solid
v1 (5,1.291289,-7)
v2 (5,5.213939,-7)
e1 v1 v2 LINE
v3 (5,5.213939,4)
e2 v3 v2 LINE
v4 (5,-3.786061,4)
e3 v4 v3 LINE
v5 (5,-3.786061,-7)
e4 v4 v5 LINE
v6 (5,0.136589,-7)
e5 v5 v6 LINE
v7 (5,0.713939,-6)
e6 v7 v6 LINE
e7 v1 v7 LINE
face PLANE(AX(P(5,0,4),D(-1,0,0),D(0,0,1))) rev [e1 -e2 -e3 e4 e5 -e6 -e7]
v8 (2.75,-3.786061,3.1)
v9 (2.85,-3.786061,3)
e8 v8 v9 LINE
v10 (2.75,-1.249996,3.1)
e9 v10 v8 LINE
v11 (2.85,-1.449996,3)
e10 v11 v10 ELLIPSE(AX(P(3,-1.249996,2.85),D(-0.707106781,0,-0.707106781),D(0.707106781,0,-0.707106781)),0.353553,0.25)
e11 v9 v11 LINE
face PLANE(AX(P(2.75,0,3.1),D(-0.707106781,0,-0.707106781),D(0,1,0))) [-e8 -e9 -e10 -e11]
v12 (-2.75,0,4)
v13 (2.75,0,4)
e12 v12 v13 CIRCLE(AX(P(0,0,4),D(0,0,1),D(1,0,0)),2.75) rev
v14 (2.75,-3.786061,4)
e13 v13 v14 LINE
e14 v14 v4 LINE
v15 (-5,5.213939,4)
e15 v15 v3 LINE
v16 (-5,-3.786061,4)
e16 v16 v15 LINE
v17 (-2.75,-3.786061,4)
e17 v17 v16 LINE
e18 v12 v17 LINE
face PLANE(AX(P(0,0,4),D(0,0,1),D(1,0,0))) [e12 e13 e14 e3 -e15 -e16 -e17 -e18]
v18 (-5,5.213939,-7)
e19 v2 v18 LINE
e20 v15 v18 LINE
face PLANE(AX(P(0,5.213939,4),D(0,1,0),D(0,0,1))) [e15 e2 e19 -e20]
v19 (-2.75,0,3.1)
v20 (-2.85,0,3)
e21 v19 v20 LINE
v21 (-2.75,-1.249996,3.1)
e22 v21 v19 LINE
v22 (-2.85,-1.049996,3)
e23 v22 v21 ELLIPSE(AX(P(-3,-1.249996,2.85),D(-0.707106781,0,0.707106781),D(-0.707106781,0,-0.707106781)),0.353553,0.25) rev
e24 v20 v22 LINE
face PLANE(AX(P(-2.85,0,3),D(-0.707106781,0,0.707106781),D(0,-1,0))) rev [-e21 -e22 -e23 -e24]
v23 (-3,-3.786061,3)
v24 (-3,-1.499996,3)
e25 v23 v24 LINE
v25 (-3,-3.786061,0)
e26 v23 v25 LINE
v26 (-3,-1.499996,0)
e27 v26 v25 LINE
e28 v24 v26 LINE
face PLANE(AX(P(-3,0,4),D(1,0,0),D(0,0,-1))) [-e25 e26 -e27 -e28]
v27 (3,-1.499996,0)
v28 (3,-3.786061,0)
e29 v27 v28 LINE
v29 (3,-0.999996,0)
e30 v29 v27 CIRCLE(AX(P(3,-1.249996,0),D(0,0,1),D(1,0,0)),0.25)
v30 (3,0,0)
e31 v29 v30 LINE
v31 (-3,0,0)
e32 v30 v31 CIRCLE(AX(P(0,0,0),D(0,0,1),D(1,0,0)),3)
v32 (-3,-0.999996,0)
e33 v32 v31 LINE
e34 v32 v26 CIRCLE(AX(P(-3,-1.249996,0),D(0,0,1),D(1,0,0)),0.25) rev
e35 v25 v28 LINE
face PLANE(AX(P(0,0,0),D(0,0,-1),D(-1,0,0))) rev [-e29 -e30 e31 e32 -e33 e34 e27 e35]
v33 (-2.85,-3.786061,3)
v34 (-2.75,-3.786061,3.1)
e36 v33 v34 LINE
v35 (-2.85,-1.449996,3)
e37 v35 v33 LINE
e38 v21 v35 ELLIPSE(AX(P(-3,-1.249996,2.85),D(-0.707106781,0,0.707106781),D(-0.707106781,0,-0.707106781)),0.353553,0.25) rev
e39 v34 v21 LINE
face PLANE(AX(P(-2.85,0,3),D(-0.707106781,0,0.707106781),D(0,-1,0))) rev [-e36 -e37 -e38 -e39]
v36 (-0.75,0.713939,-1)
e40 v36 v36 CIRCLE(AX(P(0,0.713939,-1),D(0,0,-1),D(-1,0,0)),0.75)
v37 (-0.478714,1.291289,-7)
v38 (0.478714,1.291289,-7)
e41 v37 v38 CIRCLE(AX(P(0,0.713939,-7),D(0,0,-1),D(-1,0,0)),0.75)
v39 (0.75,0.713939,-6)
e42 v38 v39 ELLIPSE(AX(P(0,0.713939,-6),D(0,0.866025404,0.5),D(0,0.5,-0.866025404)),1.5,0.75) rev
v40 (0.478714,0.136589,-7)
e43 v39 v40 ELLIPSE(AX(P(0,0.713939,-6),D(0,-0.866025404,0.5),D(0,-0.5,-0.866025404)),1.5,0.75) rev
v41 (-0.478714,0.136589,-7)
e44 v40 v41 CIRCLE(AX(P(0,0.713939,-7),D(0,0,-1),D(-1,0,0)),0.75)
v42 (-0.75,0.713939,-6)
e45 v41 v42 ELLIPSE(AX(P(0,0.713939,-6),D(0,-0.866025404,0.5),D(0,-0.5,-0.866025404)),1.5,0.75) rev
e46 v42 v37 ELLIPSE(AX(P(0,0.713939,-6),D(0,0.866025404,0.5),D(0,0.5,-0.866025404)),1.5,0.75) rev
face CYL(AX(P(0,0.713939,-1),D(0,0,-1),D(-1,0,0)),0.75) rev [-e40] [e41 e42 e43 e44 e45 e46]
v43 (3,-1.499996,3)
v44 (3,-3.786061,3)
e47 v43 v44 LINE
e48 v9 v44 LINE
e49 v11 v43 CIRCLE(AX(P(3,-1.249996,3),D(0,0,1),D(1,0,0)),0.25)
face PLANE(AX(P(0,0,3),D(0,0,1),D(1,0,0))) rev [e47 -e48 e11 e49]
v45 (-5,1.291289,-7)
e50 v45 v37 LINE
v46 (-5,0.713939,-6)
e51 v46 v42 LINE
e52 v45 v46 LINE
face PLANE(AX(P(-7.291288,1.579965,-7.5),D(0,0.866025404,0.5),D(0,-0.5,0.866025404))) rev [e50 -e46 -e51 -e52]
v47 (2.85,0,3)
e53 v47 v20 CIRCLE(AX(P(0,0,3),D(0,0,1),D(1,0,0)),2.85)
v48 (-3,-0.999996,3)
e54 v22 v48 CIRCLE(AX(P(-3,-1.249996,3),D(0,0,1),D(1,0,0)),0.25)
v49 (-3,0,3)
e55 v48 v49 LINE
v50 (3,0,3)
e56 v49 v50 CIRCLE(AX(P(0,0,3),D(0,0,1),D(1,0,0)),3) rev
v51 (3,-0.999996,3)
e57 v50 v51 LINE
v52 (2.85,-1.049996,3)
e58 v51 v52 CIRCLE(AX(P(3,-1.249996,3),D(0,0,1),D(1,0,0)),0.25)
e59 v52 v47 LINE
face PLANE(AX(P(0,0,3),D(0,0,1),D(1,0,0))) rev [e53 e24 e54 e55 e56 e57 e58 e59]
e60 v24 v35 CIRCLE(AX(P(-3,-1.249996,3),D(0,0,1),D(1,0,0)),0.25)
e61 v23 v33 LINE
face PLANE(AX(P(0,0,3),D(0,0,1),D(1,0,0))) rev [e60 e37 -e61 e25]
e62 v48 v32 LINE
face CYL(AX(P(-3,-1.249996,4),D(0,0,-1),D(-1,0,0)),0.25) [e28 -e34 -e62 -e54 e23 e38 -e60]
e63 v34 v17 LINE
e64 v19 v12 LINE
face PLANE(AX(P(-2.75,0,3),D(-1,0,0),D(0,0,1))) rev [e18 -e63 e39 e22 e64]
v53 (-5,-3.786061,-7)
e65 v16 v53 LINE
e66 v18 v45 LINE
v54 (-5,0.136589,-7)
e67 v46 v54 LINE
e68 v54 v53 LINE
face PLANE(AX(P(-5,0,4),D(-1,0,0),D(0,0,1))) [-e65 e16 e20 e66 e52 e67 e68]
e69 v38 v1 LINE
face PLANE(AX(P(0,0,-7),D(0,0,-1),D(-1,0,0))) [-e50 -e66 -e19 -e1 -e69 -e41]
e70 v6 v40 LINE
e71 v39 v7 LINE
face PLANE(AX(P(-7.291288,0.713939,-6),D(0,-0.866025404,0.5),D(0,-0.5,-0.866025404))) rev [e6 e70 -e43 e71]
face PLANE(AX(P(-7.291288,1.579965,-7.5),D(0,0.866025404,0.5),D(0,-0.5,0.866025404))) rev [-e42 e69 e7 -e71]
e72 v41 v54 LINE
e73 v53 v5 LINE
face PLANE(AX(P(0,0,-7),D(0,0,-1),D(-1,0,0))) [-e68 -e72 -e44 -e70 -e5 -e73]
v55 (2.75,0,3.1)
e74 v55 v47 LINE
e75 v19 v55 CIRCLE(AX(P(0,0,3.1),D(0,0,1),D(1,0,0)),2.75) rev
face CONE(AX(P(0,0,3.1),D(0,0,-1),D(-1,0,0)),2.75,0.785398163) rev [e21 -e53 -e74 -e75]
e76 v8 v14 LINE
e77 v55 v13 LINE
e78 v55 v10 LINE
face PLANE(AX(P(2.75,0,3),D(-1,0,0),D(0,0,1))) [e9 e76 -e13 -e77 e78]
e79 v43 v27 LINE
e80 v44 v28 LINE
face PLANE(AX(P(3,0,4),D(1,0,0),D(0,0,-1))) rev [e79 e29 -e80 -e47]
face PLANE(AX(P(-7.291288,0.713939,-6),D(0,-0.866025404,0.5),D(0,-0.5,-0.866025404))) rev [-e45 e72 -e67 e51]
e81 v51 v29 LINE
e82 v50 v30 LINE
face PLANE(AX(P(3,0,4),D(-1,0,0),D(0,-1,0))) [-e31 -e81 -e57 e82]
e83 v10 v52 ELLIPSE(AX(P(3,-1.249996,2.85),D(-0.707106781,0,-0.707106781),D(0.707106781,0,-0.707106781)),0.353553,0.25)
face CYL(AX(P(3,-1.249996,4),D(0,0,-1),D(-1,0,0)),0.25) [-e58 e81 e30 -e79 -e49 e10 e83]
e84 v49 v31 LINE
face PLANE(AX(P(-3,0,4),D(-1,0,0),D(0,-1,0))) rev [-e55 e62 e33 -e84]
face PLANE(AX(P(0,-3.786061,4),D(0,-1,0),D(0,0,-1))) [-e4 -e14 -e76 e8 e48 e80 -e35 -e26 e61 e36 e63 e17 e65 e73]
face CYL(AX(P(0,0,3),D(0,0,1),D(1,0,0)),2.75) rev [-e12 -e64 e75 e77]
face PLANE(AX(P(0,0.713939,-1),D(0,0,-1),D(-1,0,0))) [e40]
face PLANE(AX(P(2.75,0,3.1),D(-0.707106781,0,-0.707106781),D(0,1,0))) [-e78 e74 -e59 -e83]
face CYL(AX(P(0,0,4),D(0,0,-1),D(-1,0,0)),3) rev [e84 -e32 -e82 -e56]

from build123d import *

# Parameters (mm, degrees)
BOSS_EXTRUDE1_DEPTH = 4
SKETCH2_W           = 10
SKETCH2_H           = 9
BOSS_EXTRUDE2_DEPTH = 7
SKETCH3_R           = 0.75
CUT_EXTRUDE1_DEPTH  = 6
CUT_EXTRUDE3_REACH  = 15.273
BOSS_EXTRUDE3_START = -1
BOSS_EXTRUDE3_DEPTH = 1
CHAMFER1_SIZE       = 0.1


with BuildPart() as part:
    # Sketch1 → Boss-Extrude1 (new body)
    with BuildSketch(Plane.XY):
        with BuildLine():
            Line((-3, -3.786060838), (-3, -1.49999581))
            ThreePointArc((-3, -1.49999581), (-2.791987509, -1.388670983), (-2.769230655, -1.153842239))
            ThreePointArc((-2.769230655, -1.153842239), (-2.861324827, -1.041983319), (-3, -0.99999581))
            Line((-3, -0.99999581), (-3, 0))
            ThreePointArc((-3, 0), (0, 3), (3, 0))
            Line((3, 0), (3, -0.99999581))
            ThreePointArc((3, -0.99999581), (2.861324827, -1.041983319), (2.769230655, -1.153842239))
            ThreePointArc((2.769230655, -1.153842239), (2.791987509, -1.388670983), (3, -1.49999581))
            Line((3, -1.49999581), (3, -3.786060838))
            Line((3, -3.786060838), (5, -3.786060838))
            Line((5, -3.786060838), (5, 5.213939162))
            Line((5, 5.213939162), (-5, 5.213939162))
            Line((-5, 5.213939162), (-5, -3.786060838))
            Line((-5, -3.786060838), (-3, -3.786060838))
        make_face()
    extrude(amount=BOSS_EXTRUDE1_DEPTH)

    # Sketch2 → Boss-Extrude2 (add)
    with BuildSketch(Plane.XY):
        with Locations((0, 0.713939162)):
            Rectangle(SKETCH2_W, SKETCH2_H)
    extrude(amount=-BOSS_EXTRUDE2_DEPTH)

    # Sketch3 → Cut-Extrude1 (cut)
    with BuildSketch(Plane(origin=(0, 0, -7), x_dir=(-1, 0, 0), z_dir=(0, 0, -1))):
        with Locations((0, 0.713939162)):
            Circle(SKETCH3_R)
    extrude(amount=-CUT_EXTRUDE1_DEPTH, mode=Mode.SUBTRACT)

    # Cut-Extrude3: up to this face of the body (flat: up to its plane)
    cut_extrude3_end = Plane(part.part.faces().sort_by_distance((-5, 0.713939162, -1.5))[0])
    # Sketch4 → Cut-Extrude3 (cut, up to the picked face)
    with BuildSketch(Plane(origin=(5, 0, 0), x_dir=(0, 0, -1), z_dir=(1, 0, 0)), mode=Mode.PRIVATE) as cut_extrude3_sk1:
        Polygon((7.5, -0.152086242), (7.5, 1.579964565), (6, 0.713939162), align=None)
    cut_extrude3_tool1 = split(extrude(cut_extrude3_sk1.sketch, amount=-CUT_EXTRUDE3_REACH, mode=Mode.PRIVATE), bisect_by=cut_extrude3_end, keep=Keep.BOTH, mode=Mode.PRIVATE)
    add(cut_extrude3_tool1.solids().sort_by(Axis((5, 0.713939, -7), (-1, 0, 0)))[0], mode=Mode.SUBTRACT)

    # Sketch5 → Boss-Extrude3 (add)
    with BuildSketch(Plane.XY.offset(4).offset(BOSS_EXTRUDE3_START)):
        with BuildLine():
            ThreePointArc((3, 0), (0, 3), (-3, 0))
            Line((-3, 0), (-3, -3.786060838))
            Line((-3, -3.786060838), (-2.75, -3.786060838))
            Line((-2.75, -3.786060838), (-2.75, 0))
            ThreePointArc((-2.75, 0), (0, 2.75), (2.75, 0))
            Line((2.75, 0), (2.75, -3.786060838))
            Line((2.75, -3.786060838), (3, -3.786060838))
            Line((3, -3.786060838), (3, 0))
        make_face()
    extrude(amount=BOSS_EXTRUDE3_DEPTH)

    # Chamfer1
    # the kernel refuses this chamfer: 0.1 mm, written as the material it takes off along each edge
    with BuildSketch(Plane(origin=(2.75, -1.24999581, 3), x_dir=(-0.027495876610587302, 0, 0.9996219169112966), z_dir=(0, -1, 0))) as chamfer1_piece_1_section:
        Polygon((CHAMFER1_SIZE * 0.999621916911, -CHAMFER1_SIZE * 0.0274958766106), (-CHAMFER1_SIZE * 0.0274958766106, -CHAMFER1_SIZE * 0.999621916911), (0, 0), align=None)
    chamfer1_piece_1 = extrude(amount=2.793233327, mode=Mode.PRIVATE)
    chamfer1_piece_1 = chamfer1_piece_1 - Plane(origin=(3, -1.24999581, 3.033543391), x_dir=(0, 1, 0), z_dir=(0, 0, -1)) * Cylinder(0.25, 6, mode=Mode.PRIVATE)
    add(chamfer1_piece_1, mode=Mode.SUBTRACT)
    with BuildSketch(Plane(origin=(-2.75, -4.043229137, 3), x_dir=(-0.9996219169112966, 0, -0.027495876610587302), z_dir=(0, 1, 0))) as chamfer1_piece_2_section:
        Polygon((CHAMFER1_SIZE * 0.999621916911, CHAMFER1_SIZE * 0.0274958766106), (-CHAMFER1_SIZE * 0.0274958766106, CHAMFER1_SIZE * 0.999621916911), (0, 0), align=None)
    chamfer1_piece_2 = extrude(amount=2.793233327, mode=Mode.PRIVATE)
    chamfer1_piece_2 = chamfer1_piece_2 - Plane(origin=(-3, -1.24999581, 3.033543414), x_dir=(0, -1, 0), z_dir=(0, 0, -1)) * Cylinder(0.25, 6, mode=Mode.PRIVATE)
    add(chamfer1_piece_2, mode=Mode.SUBTRACT)
    with BuildSketch(Plane(origin=(2.75, 0, 3), x_dir=(-0.027495876610587302, 0, 0.9996219169112966), z_dir=(0, -1, 0))) as chamfer1_piece_3_section:
        Polygon((CHAMFER1_SIZE * 0.999621916911, -CHAMFER1_SIZE * 0.0274958766106), (-CHAMFER1_SIZE * 0.0274958766106, -CHAMFER1_SIZE * 0.999621916911), (0, 0), align=None)
    chamfer1_piece_3 = extrude(amount=1.24999581, mode=Mode.PRIVATE)
    chamfer1_piece_3 = chamfer1_piece_3 - Plane(origin=(3, -1.24999581, 3.033781207), x_dir=(0, 1, 0), z_dir=(0, 0, -1)) * Cylinder(0.25, 3, mode=Mode.PRIVATE)
    add(chamfer1_piece_3, mode=Mode.SUBTRACT)
    with BuildSketch(Plane(origin=(0, 0, 3), x_dir=(-1, 0, 0), z_dir=(0, -1, 0))) as chamfer1_piece_4:
        Polygon((2.75, -CHAMFER1_SIZE), (2.75 + CHAMFER1_SIZE, 0), (2.75, 0), align=None)
    revolve(axis=Axis((0, 0, 3), (0, 0, -1)), revolution_arc=180, mode=Mode.SUBTRACT)
    with BuildSketch(Plane(origin=(-2.75, -1.24999581, 3), x_dir=(-0.9996219169112966, 0, -0.027495876610587302), z_dir=(0, 1, 0))) as chamfer1_piece_5_section:
        Polygon((CHAMFER1_SIZE * 0.999621916911, CHAMFER1_SIZE * 0.0274958766106), (-CHAMFER1_SIZE * 0.0274958766106, CHAMFER1_SIZE * 0.999621916911), (0, 0), align=None)
    chamfer1_piece_5 = extrude(amount=1.24999581, mode=Mode.PRIVATE)
    chamfer1_piece_5 = chamfer1_piece_5 - Plane(origin=(-3, -1.24999581, 3.033781195), x_dir=(0, -1, 0), z_dir=(0, 0, -1)) * Cylinder(0.25, 3, mode=Mode.PRIVATE)
    add(chamfer1_piece_5, mode=Mode.SUBTRACT)


solid = part.part
